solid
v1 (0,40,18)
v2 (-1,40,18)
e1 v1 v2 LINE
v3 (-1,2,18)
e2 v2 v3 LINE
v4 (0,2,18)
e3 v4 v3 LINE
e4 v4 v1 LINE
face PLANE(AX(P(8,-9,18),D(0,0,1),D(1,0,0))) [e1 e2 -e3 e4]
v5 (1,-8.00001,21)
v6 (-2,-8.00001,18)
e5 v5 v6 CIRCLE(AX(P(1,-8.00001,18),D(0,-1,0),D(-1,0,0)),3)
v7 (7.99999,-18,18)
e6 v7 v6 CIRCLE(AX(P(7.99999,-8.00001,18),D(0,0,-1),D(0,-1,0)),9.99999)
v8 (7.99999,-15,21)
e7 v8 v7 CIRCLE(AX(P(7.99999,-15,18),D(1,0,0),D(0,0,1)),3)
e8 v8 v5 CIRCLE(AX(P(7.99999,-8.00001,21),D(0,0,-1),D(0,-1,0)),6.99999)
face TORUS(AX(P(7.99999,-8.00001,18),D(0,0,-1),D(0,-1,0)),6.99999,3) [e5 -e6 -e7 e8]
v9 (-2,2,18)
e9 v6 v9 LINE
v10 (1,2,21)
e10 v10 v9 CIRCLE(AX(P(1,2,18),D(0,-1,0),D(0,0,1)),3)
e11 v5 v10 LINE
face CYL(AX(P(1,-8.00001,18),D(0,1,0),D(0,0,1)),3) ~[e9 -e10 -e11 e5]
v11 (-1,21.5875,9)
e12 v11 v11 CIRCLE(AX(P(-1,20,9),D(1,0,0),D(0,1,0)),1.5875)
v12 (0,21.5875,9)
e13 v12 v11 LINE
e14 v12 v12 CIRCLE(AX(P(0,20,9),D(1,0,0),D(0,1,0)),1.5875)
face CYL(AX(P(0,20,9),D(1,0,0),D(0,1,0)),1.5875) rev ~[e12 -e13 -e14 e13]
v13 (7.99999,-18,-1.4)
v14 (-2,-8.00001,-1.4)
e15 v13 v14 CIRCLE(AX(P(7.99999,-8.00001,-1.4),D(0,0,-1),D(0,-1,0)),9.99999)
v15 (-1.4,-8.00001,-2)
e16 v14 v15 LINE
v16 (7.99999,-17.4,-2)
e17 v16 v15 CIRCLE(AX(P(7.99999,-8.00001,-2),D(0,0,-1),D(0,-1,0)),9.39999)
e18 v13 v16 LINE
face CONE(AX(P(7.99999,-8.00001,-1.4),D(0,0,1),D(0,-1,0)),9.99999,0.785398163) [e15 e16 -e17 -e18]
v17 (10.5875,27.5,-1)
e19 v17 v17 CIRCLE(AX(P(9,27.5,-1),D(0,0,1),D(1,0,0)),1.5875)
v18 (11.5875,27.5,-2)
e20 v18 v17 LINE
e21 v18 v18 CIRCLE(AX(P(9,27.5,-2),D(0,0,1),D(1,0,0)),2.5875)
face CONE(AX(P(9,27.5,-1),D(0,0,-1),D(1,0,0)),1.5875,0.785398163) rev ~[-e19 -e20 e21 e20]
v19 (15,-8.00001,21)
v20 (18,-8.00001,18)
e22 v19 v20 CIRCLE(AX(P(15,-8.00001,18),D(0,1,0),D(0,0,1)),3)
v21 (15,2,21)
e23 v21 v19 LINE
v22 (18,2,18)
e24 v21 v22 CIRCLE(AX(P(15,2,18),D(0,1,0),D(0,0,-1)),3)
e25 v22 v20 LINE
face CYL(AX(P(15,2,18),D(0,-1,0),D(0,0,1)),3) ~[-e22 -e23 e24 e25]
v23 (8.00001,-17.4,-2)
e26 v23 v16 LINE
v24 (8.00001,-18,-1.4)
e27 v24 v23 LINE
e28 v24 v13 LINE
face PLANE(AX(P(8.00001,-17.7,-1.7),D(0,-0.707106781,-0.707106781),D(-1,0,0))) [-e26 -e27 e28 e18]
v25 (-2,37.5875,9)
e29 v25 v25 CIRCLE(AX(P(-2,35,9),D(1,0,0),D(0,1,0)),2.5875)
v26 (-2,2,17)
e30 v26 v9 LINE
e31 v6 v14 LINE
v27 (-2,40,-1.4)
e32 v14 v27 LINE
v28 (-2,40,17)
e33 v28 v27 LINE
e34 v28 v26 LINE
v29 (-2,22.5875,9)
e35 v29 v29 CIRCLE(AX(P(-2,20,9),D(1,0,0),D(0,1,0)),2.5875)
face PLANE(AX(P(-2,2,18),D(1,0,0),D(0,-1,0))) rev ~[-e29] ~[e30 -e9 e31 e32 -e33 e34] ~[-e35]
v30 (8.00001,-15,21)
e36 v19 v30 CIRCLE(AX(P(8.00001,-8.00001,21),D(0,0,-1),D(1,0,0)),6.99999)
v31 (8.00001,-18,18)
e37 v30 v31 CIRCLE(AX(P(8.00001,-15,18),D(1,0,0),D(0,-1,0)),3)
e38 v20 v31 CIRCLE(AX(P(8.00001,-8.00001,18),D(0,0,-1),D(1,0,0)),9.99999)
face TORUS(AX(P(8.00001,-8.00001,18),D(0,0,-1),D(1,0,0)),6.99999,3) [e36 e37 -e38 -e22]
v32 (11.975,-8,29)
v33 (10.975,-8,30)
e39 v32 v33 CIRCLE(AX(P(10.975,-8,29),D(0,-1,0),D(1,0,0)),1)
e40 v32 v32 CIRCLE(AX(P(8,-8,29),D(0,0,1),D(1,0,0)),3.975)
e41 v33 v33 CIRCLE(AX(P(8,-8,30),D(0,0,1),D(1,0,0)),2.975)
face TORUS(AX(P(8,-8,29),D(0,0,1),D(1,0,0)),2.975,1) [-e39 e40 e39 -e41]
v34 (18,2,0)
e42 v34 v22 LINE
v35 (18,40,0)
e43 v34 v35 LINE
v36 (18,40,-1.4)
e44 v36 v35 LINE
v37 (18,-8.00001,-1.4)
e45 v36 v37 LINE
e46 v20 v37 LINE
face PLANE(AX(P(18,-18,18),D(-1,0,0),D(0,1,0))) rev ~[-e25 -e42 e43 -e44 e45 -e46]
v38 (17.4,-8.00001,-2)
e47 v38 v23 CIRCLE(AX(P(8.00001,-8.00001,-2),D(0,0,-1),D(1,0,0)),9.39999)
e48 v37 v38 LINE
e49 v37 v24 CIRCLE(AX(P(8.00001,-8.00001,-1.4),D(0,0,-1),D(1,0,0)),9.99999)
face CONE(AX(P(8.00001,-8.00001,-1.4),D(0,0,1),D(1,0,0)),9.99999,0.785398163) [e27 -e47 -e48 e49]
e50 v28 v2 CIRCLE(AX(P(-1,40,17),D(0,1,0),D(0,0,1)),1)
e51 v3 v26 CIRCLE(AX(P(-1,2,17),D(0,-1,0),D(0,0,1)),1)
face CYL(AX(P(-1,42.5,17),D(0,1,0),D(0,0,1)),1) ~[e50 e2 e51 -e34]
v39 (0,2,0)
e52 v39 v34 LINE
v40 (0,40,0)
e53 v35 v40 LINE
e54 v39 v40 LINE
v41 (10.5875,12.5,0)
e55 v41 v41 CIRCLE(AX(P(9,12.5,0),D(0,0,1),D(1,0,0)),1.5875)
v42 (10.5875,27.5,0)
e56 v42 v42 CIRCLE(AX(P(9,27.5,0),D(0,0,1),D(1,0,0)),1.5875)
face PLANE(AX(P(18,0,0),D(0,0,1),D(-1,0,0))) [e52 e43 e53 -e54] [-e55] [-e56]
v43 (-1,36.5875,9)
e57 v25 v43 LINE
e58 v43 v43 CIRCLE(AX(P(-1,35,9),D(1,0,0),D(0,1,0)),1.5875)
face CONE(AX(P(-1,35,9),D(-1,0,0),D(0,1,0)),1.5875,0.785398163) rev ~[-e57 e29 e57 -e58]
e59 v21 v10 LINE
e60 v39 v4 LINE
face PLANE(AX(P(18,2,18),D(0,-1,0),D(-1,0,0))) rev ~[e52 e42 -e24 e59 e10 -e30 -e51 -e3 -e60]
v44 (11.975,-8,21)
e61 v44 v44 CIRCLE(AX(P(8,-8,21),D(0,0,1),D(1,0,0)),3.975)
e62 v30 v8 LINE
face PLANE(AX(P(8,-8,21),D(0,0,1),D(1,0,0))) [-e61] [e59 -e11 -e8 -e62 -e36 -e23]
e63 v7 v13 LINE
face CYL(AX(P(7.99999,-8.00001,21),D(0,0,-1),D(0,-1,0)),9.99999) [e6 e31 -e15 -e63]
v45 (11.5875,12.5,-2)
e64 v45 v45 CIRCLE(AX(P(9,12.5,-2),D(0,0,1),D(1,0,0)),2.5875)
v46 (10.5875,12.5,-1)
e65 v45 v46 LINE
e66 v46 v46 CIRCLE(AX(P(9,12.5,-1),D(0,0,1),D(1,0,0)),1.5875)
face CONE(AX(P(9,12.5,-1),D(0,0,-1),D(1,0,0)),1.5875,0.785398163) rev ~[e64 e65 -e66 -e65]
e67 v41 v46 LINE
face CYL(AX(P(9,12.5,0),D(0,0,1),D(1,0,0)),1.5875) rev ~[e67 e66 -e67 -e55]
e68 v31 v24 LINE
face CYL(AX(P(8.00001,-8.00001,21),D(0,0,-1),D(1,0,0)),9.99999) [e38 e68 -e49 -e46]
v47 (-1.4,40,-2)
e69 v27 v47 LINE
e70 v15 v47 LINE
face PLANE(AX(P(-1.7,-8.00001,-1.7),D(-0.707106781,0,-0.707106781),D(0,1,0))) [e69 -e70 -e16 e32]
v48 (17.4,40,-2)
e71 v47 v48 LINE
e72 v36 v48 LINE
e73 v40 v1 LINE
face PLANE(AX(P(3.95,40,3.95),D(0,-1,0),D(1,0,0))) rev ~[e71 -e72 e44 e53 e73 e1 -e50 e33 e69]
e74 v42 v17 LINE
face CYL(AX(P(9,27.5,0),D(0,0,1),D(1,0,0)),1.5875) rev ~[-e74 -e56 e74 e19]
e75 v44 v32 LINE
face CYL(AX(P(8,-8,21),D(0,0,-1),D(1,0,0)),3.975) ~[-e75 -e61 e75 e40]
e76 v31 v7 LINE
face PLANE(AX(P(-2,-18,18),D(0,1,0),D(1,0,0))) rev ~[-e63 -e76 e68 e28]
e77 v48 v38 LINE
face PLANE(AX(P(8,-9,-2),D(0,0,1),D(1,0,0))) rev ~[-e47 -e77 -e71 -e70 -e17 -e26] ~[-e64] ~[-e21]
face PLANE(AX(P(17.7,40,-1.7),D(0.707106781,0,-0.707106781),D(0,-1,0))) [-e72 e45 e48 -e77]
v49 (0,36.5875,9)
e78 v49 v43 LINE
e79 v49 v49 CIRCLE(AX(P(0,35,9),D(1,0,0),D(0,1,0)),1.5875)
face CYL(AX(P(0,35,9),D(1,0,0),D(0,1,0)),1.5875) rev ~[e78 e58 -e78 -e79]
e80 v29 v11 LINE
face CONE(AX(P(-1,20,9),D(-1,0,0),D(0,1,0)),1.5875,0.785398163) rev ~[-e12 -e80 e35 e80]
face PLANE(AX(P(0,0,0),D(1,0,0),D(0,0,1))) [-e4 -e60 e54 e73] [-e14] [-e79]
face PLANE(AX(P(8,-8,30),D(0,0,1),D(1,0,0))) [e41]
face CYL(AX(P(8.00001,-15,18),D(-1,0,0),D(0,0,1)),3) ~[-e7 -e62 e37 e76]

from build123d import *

# Parameters (mm, degrees)
F1_DEPTH     = 40
F2_W         = 2
F2_H         = 18
F3_DEPTH     = 18
F4_R         = 1.5875
F5_DEPTH     = 2.001
F6_R         = 1.5875
F7_DEPTH     = 2.001
F8_SIZE      = 1
F9_W         = 20
F9_H         = 18
F10_DEPTH    = 20
F12_DEPTH    = 3
F13_R        = 3.975
F14_DEPTH    = 9
F15_R        = 1
F16_R        = 9.99999
F17_R        = 3
F18_T1_DEPTH = 40.5
F19_SIZE     = 0.6


# Not quite as in the source:
# - a fillet or chamfer that OpenCascade refuses, or shapes differently, is made with other operations: its cross-section is extruded or revolved along the edge and cut away or added
# - a fillet or chamfer is up to 0.001 mm smaller than in the source, because OpenCascade refuses the exact size


with BuildPart() as f1:
    # F0 (on Front) → F1 (new body)
    with BuildSketch(Plane.XZ):
        Polygon((-2, 18), (-2, -2), (18, -2), (18, 0), (0, 0), (0, 18), align=None)
    extrude(amount=-F1_DEPTH)

    # F2 (on face) → F3 (join, through all)
    with BuildSketch(Plane.YZ):
        with Locations((1, 9)):
            Rectangle(F2_W, F2_H)
    extrude(amount=F3_DEPTH)

    # F4 (on face) → F5 (cut, through all)
    with BuildSketch(Plane.XY):
        with Locations((9, 12.5)):
            Circle(F4_R)
        with Locations((9, 27.5)):
            Circle(F4_R)
    extrude(amount=-F5_DEPTH, mode=Mode.SUBTRACT)

    # F6 (on face) → F7 (cut, through all)
    with BuildSketch(Plane.YZ):
        with Locations((35, 9)):
            Circle(F6_R)
        with Locations((20, 9)):
            Circle(F6_R)
    extrude(amount=-F7_DEPTH, mode=Mode.SUBTRACT)

    # F8
    f8_edges = [f1.edges().sort_by_distance(p)[0] for p in [
        (-2, 18.4125, 9),
        (-2, 33.4125, 9),
        (7.4125, 27.5, -2),
        (7.4125, 12.5, -2),
    ]]
    chamfer(f8_edges, length=F8_SIZE)

    # F9 (on face) → F10 (join, through all)
    with BuildSketch(Plane.XY.offset(18)):
        with Locations((8, -9)):
            Rectangle(F9_W, F9_H)
    extrude(amount=-F10_DEPTH)

    # F11 (on face) → F12 (join)
    with BuildSketch(Plane.XY.offset(18)):
        Polygon((18, -18), (18, 2), (0, 2), (-2, 2), (-2, -18), align=None)
    extrude(amount=F12_DEPTH)

    # F13 (on face) → F14 (join)
    with BuildSketch(Plane.XY.offset(21)):
        with Locations((8, -8)):
            Circle(F13_R)
    extrude(amount=F14_DEPTH)

    # F15
    f15_edges = [f1.edges().sort_by_distance(p)[0] for p in [
        (4.025, -8, 30),
    ]]
    fillet(f15_edges, radius=F15_R)

    # F16 (radius 10 in the source; OpenCascade refuses exactly that, so slightly less here)
    f16_edges = [f1.edges().sort_by_distance(p)[0] for p in [
        (-2, -18, 9.5),
        (18, -18, 9.5),
    ]]
    fillet(f16_edges, radius=F16_R)

    # F17
    f17_edges = [f1.edges().sort_by_distance(p)[0] for p in [
        (0.928929, -15.071071, 21),
        (-2, -3.000005, 21),
        (18, -3.000005, 21),
        (15.071071, -15.071071, 21),
        (8, -18, 21),
    ]]
    fillet(f17_edges, radius=F17_R)

    # F18: fillet of radius 1 on 1 edges, made by hand

    # F18_s2 → F18_t1 (cut)
    with BuildSketch(Plane.XZ.offset(-42.5)):
        with BuildLine():
            ThreePointArc((-1, 18), (-1.7071067812, 17.7071067812), (-2, 17))
            Line((-2, 17), (-2, 18))
            Line((-2, 18), (-1, 18))
        make_face()
    extrude(amount=F18_T1_DEPTH, mode=Mode.SUBTRACT)

    # F19
    f19_edges = [f1.edges().sort_by_distance(p)[0] for p in [
        (18, 15.999995, -2),
        (-2, 15.999995, -2),
        (0.928929, -15.071071, -2),
        (15.071071, -15.071071, -2),
        (8, -18, -2),
    ]]
    chamfer(f19_edges, length=F19_SIZE)


solid = f1.part
